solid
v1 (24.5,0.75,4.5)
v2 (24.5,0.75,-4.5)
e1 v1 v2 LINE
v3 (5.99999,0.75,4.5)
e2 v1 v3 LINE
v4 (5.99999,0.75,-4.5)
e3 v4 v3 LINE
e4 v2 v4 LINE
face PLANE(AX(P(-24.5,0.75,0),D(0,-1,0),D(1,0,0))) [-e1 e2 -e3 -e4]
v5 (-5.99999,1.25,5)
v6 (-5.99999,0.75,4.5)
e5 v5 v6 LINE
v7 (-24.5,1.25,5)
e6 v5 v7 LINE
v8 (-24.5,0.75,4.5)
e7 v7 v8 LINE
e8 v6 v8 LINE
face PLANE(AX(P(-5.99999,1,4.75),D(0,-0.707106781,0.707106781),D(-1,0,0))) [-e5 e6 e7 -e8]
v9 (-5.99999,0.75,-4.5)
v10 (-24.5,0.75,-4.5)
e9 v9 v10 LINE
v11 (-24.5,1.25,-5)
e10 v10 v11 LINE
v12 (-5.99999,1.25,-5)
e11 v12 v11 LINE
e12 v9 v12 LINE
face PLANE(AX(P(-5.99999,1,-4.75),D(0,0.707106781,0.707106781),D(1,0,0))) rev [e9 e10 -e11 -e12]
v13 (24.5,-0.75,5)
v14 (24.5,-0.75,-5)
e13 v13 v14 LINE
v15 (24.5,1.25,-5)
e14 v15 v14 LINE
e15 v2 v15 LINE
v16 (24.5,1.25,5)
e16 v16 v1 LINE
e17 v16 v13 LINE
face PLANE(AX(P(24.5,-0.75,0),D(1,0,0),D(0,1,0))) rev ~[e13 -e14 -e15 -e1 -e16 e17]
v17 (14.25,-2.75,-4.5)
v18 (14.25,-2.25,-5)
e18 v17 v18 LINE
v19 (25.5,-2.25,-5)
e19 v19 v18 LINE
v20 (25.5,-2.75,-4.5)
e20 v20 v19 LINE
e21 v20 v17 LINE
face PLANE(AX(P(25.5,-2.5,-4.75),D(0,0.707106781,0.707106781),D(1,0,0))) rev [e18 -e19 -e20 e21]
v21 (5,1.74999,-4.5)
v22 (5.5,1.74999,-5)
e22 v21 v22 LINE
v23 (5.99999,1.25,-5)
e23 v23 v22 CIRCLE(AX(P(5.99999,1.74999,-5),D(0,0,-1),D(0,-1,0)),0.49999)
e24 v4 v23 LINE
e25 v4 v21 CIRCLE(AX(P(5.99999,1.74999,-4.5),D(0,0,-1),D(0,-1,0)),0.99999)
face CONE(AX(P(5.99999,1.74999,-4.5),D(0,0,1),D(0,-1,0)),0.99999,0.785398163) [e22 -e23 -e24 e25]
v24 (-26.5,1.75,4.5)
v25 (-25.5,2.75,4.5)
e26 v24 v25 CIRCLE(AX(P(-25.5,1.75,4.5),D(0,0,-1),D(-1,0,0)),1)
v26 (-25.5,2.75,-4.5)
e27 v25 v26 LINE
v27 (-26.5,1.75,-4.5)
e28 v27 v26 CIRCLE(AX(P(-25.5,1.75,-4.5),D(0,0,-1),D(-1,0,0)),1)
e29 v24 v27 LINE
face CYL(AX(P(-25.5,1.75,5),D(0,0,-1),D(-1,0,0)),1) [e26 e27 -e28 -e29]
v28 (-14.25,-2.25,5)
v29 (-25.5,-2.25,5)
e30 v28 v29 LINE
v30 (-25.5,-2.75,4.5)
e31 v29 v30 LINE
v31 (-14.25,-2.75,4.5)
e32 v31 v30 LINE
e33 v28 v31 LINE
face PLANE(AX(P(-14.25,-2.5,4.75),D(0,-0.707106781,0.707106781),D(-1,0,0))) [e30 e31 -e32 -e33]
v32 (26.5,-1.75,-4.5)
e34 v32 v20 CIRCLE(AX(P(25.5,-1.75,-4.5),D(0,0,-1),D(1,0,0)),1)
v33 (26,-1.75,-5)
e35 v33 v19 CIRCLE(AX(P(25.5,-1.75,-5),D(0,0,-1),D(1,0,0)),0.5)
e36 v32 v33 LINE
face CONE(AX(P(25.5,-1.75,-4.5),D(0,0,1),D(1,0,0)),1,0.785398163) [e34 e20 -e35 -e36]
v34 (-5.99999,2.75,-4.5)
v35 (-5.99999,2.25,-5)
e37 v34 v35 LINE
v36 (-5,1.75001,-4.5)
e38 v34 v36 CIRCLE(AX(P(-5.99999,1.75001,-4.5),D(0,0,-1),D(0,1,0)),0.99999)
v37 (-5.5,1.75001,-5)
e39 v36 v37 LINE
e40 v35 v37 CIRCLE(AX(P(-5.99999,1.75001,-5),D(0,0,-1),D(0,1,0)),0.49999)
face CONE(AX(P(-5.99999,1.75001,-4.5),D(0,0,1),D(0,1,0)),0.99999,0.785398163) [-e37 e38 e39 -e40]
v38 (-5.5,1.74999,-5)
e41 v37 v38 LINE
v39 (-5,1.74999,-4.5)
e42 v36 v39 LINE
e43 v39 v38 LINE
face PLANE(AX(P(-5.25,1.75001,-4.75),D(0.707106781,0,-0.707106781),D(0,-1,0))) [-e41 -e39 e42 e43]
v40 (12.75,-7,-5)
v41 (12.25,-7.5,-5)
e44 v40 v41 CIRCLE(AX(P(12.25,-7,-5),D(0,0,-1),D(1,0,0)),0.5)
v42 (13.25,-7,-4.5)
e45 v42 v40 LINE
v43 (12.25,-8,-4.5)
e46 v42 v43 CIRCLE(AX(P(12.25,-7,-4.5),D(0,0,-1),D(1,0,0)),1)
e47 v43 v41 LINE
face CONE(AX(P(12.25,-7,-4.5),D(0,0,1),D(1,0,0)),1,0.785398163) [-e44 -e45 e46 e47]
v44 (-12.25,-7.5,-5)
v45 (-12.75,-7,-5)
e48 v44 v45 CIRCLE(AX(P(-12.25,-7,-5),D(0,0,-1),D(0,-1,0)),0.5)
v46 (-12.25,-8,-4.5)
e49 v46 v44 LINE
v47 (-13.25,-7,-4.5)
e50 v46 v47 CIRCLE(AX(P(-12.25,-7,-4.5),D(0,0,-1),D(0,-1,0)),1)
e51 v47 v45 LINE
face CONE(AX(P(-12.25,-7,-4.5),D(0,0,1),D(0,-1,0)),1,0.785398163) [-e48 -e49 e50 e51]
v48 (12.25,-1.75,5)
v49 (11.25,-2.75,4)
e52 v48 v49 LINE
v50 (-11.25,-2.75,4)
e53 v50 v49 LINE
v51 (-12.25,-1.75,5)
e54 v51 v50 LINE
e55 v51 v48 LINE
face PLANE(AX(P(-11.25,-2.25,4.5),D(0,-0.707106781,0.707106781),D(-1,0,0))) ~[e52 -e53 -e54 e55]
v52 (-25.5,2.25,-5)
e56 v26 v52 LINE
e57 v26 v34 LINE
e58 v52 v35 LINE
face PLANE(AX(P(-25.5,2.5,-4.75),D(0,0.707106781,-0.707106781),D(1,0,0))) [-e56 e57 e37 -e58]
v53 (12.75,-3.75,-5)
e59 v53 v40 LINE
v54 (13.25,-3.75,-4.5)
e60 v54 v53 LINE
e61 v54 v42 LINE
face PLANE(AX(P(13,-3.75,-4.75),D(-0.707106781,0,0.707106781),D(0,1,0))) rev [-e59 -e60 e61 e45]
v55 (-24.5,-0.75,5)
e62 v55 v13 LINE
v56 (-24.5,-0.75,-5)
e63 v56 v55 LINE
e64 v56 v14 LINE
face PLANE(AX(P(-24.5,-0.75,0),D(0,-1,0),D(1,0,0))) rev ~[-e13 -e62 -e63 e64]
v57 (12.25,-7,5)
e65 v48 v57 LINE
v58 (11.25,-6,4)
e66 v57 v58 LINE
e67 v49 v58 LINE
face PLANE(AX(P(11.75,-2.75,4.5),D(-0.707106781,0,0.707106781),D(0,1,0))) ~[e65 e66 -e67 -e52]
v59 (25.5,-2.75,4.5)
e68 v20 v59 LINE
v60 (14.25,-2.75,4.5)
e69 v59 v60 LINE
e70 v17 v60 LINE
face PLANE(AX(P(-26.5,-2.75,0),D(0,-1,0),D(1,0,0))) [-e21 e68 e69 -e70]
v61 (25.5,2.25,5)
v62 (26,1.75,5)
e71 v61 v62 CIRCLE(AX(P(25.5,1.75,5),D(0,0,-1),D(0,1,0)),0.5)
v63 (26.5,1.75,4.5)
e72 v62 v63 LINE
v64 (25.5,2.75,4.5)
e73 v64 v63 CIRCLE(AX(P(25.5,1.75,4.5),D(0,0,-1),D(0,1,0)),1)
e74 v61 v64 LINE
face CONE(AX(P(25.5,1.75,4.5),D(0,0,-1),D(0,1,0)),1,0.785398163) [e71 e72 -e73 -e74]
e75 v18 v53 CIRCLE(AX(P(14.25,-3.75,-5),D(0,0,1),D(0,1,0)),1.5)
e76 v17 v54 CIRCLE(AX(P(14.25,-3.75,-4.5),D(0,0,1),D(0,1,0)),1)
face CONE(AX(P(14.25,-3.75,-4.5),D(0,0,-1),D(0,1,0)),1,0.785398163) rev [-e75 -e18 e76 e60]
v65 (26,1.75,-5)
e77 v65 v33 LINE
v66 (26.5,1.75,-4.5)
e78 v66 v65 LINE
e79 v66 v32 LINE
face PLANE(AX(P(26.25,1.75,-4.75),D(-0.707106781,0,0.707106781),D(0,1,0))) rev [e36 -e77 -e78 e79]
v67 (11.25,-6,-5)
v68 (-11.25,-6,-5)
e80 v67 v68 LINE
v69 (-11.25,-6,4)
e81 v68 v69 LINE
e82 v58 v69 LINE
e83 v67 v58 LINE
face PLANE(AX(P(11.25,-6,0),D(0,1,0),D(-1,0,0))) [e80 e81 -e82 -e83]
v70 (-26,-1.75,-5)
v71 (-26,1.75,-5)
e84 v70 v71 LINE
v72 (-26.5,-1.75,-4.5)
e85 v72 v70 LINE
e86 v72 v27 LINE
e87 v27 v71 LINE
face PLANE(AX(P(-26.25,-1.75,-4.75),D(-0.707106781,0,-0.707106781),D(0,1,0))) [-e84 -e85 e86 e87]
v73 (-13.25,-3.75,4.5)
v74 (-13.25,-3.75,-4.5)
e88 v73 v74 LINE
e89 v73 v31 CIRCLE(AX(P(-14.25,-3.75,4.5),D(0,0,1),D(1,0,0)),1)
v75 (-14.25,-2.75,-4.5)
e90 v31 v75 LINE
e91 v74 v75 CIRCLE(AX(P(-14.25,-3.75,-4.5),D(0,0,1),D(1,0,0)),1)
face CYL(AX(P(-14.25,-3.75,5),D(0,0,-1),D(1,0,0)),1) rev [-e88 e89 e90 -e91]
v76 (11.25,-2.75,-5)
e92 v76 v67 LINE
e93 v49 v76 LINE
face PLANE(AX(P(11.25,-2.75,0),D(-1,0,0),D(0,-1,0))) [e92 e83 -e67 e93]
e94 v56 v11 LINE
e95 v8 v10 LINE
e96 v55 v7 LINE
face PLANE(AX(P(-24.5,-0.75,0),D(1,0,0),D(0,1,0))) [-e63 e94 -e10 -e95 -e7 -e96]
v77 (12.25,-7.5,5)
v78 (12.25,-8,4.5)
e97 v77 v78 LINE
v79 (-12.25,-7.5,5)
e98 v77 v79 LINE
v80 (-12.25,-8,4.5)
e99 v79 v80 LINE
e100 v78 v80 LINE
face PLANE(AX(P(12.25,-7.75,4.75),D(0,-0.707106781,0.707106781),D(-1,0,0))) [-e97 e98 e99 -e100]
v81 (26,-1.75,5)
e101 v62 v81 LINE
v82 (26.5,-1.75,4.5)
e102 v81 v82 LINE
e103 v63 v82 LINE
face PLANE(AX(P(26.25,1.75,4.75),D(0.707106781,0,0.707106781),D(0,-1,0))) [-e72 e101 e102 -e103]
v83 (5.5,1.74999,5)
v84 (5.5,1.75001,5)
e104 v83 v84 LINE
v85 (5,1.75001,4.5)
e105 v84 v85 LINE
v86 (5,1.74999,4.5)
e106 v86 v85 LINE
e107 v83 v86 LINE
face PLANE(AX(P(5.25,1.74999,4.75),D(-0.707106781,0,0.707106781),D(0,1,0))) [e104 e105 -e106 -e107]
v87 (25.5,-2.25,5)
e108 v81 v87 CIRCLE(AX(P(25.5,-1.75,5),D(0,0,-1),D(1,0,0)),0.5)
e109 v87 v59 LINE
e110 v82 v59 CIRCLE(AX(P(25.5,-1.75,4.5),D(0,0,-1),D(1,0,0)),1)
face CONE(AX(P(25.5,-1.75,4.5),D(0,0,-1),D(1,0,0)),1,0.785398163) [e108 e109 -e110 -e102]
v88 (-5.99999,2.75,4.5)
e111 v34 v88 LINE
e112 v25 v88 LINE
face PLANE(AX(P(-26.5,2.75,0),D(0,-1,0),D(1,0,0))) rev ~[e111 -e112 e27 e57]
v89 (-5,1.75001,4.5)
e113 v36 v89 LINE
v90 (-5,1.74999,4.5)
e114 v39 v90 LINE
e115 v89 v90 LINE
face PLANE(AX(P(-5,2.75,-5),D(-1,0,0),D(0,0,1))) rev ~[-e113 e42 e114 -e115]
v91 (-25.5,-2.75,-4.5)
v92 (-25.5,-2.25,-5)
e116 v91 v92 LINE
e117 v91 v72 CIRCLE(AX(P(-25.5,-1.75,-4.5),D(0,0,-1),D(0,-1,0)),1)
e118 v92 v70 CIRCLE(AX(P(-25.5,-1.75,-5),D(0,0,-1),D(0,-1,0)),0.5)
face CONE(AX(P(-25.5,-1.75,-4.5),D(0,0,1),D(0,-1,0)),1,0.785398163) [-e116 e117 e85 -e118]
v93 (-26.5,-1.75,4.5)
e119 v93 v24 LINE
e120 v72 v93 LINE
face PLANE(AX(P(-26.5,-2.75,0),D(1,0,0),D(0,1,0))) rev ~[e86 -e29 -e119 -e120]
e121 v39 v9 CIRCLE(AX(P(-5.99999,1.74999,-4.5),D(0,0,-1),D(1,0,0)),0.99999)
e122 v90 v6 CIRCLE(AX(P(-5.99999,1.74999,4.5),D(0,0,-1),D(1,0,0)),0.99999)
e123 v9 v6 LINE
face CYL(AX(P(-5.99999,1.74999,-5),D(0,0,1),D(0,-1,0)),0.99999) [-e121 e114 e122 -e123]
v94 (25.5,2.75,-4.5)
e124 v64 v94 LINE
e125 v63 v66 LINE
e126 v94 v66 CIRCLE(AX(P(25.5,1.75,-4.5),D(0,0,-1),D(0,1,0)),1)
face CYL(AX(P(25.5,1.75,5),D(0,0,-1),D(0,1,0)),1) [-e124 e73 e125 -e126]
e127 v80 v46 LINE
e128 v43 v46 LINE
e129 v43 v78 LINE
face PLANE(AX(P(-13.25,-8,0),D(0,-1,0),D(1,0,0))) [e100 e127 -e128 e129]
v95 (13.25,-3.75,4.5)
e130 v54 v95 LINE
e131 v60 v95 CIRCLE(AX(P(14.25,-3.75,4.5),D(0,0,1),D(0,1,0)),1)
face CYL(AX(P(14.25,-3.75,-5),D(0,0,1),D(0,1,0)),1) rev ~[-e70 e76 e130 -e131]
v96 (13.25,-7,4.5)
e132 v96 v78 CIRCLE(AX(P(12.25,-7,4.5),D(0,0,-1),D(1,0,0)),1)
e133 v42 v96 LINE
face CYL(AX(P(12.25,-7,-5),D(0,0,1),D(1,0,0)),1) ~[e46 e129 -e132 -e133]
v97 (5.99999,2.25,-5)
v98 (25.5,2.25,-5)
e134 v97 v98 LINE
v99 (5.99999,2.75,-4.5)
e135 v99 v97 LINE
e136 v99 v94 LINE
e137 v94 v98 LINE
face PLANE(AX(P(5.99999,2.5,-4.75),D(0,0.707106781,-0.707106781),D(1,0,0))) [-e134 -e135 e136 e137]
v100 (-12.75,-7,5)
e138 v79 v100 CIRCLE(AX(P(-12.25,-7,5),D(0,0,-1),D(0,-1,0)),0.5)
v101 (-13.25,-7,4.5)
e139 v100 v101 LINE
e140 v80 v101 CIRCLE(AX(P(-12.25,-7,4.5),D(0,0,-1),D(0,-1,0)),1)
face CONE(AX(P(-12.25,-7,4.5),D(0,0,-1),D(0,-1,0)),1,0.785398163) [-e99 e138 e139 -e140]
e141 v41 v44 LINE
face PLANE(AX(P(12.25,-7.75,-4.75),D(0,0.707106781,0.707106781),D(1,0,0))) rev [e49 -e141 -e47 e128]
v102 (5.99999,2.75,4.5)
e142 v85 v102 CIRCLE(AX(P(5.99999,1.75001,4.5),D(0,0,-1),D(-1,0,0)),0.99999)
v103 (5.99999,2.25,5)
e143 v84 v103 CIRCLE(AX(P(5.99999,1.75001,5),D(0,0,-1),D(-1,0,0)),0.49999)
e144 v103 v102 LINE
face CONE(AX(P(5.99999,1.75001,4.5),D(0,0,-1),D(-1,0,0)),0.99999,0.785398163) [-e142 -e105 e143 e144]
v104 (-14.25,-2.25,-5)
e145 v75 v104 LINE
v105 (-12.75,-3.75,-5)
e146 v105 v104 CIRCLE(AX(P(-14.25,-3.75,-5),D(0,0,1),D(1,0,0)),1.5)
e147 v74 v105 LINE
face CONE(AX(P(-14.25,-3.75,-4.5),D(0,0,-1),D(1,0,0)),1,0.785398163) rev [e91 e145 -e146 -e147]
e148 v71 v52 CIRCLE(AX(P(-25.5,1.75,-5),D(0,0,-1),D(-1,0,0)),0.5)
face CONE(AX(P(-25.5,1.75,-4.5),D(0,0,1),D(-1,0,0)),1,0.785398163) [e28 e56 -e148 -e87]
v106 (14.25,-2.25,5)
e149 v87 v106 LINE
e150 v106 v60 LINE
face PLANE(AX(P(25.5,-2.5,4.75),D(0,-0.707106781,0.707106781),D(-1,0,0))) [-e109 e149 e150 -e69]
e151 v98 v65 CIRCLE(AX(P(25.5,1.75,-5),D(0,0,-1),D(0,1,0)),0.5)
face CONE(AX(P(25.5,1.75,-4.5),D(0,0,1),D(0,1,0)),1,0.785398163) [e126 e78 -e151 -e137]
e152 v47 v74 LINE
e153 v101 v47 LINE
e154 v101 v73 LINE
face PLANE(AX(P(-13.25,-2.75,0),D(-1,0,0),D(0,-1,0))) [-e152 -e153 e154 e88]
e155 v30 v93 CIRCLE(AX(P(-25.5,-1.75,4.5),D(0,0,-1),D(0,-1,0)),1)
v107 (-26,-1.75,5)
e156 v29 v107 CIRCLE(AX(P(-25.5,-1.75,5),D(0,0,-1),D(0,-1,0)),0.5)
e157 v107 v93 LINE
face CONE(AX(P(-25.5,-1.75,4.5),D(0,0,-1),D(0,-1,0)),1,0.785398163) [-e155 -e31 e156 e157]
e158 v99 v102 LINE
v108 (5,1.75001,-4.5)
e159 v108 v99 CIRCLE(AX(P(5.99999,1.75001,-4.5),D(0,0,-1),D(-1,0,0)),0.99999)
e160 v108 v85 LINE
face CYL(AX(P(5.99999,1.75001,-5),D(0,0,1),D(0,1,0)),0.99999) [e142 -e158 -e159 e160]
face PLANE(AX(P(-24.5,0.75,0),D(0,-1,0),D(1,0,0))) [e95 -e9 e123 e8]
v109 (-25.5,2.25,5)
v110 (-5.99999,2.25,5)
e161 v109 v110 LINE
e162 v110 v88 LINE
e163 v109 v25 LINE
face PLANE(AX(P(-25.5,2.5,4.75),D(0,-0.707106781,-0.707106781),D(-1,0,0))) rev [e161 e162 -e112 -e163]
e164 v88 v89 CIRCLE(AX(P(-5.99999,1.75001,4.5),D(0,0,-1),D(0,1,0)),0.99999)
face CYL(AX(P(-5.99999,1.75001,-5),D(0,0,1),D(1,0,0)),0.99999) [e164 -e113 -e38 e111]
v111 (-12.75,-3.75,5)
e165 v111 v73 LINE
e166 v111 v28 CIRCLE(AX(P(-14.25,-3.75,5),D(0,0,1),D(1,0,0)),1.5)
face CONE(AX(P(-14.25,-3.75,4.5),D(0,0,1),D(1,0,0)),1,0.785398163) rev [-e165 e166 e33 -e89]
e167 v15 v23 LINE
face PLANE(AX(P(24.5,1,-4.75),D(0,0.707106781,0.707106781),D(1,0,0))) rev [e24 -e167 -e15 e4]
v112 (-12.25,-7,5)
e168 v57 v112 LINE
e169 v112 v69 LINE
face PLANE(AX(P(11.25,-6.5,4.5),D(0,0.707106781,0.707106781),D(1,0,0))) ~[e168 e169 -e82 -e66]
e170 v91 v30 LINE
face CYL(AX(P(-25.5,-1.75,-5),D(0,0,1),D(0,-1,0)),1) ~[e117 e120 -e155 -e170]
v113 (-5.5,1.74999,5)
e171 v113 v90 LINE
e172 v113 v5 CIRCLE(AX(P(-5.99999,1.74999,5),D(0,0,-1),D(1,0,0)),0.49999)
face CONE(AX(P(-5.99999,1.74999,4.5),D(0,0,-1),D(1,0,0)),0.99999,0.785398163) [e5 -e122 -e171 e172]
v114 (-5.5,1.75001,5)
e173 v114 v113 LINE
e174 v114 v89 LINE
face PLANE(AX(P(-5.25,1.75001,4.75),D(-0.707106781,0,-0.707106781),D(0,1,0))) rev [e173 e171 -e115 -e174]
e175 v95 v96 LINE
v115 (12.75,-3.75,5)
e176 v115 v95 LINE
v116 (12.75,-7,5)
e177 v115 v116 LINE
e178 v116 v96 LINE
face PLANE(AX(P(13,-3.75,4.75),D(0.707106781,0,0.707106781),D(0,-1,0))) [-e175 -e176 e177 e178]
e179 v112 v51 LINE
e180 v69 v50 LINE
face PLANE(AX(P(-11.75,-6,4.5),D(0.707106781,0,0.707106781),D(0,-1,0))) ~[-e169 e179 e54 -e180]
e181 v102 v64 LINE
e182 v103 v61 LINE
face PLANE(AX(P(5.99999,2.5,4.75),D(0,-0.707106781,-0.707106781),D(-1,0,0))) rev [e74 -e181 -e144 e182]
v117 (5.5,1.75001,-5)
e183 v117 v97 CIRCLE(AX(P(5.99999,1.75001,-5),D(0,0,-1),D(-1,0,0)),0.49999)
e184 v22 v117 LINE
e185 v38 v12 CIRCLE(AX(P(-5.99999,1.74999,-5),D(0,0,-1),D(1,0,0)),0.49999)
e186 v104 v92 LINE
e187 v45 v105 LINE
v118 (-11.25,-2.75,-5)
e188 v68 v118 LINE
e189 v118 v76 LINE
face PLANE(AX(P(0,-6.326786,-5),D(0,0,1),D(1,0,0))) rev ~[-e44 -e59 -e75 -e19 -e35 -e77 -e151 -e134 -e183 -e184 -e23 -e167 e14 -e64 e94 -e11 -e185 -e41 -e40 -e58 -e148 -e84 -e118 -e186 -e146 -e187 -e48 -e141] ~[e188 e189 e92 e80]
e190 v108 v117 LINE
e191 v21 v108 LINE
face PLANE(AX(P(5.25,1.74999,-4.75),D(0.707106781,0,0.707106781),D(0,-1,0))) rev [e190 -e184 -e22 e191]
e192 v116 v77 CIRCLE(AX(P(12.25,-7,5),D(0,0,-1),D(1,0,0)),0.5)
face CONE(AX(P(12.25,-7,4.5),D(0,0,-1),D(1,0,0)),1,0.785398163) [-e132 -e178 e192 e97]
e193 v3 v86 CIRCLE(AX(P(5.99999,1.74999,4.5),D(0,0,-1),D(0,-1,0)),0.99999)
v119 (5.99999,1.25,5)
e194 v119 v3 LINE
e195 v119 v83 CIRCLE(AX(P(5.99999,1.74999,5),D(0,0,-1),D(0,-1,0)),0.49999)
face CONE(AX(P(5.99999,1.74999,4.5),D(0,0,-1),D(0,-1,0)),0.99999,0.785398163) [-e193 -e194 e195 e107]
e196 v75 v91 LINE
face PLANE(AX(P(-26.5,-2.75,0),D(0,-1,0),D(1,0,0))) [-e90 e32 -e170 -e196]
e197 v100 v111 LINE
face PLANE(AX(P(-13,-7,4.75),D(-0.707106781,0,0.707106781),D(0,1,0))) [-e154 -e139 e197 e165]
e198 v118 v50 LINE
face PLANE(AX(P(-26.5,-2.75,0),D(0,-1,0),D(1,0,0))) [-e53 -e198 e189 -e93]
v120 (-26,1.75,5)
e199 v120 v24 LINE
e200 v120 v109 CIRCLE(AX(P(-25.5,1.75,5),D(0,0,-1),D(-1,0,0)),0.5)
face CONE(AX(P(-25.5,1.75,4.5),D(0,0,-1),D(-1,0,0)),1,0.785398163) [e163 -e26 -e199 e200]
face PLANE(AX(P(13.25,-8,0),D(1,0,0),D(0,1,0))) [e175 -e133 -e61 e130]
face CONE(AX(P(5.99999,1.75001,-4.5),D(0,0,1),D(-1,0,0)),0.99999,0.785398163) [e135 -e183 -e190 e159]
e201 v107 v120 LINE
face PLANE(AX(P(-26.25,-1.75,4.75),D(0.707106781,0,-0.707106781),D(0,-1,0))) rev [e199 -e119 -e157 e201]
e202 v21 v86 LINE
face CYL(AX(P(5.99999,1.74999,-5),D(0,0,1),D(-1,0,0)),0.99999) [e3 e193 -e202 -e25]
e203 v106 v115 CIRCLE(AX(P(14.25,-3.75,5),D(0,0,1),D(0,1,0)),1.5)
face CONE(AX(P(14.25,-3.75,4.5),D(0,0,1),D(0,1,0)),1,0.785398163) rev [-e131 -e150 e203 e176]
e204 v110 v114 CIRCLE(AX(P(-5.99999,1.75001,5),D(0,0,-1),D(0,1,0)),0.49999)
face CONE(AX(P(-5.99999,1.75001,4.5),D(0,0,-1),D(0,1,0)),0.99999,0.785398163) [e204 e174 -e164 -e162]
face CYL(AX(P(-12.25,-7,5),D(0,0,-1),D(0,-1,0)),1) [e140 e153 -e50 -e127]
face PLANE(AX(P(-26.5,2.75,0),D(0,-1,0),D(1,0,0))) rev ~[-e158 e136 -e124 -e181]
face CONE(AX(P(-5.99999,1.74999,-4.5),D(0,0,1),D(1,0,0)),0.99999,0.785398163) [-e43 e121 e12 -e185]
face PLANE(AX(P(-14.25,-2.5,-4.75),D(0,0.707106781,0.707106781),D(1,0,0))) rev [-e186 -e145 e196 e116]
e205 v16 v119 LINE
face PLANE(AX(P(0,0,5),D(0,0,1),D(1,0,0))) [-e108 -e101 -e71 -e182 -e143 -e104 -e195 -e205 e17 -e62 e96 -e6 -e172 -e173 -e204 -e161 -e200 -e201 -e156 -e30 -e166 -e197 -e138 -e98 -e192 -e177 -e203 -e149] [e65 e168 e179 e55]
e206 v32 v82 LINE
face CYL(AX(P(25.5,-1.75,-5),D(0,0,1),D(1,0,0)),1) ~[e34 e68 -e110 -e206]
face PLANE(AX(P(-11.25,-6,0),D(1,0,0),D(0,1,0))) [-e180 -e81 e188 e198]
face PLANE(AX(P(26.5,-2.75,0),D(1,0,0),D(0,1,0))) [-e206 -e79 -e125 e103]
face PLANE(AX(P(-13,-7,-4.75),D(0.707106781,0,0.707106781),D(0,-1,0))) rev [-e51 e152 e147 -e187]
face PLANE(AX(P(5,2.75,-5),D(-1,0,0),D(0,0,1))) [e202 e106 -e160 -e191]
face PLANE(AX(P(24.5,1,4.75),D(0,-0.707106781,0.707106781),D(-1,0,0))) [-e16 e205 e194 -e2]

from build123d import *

# Parameters (mm, degrees)
F0_W          = 53
F0_H          = 5.5
F0_W_2        = 49
F0_H_2        = 1.5
F1_DEPTH      = 5
F2_W          = 10
F2_H          = 10
F3_DEPTH      = 2
F5_DEPTH      = 5
F5_DEPTH_BACK = 5
F6_SIZE       = 1
F7_R          = 0.99999
F8_R          = 1
F9_SIZE       = 0.5


# Not quite as in the source:
# - a fillet or chamfer is up to 0.001 mm smaller than in the source, because OpenCascade refuses the exact size


with BuildPart() as f1:
    # F0 (on Top) → F1 (new body, symmetric)
    with BuildSketch(Plane.XY):
        Rectangle(F0_W, F0_H)
        Rectangle(F0_W_2, F0_H_2, mode=Mode.SUBTRACT)
    extrude(amount=F1_DEPTH, both=True)

    # F2 (on face) → F3 (cut, through all)
    with BuildSketch(Plane(origin=(0, 2.75, 0), x_dir=(-1, 0, 0), z_dir=(0, 1, 0))):
        Rectangle(F2_W, F2_H)
    extrude(amount=-F3_DEPTH, mode=Mode.SUBTRACT)

    # F4 (on Top) → F5 (join, two sides)
    with BuildSketch(Plane.XY) as f5_sk:
        Polygon((-13.25, -8), (13.25, -8), (13.25, -2.75), (11.25, -2.75), (11.25, -6), (-11.25, -6), (-11.25, -2.75), (-13.25, -2.75), align=None)
    extrude(amount=F5_DEPTH)
    extrude(f5_sk.sketch, amount=-F5_DEPTH_BACK)

    # F6
    f6_edges = [f1.edges().sort_by_distance(p)[0] for p in [
        (0, -2.75, 5),
        (0, -6, 5),
        (11.25, -4.375, 5),
        (-11.25, -4.375, 5),
    ]]
    chamfer(f6_edges, length=F6_SIZE)

    # F7 (radius 1 in the source; OpenCascade refuses exactly that, so slightly less here)
    f7_edges = [f1.edges().sort_by_distance(p)[0] for p in [
        (-5, 2.75, 0),
        (5, 0.75, 0),
        (5, 2.75, 0),
        (-5, 0.75, 0),
    ]]
    fillet(f7_edges, radius=F7_R)

    # F8
    f8_edges = [f1.edges().sort_by_distance(p)[0] for p in [
        (-13.25, -2.75, 0),
        (-26.5, -2.75, 0),
        (26.5, -2.75, 0),
        (-13.25, -8, 0),
        (26.5, 2.75, 0),
        (13.25, -8, 0),
        (13.25, -2.75, 0),
        (-26.5, 2.75, 0),
    ]]
    fillet(f8_edges, radius=F8_R)

    # F9
    f9_edges = [f1.edges().sort_by_distance(p)[0] for p in [
        (-15.749995, 2.75, -5),
        (-15.749995, 2.75, 5),
    ]]
    chamfer(f9_edges, length=F9_SIZE)


solid = f1.part
